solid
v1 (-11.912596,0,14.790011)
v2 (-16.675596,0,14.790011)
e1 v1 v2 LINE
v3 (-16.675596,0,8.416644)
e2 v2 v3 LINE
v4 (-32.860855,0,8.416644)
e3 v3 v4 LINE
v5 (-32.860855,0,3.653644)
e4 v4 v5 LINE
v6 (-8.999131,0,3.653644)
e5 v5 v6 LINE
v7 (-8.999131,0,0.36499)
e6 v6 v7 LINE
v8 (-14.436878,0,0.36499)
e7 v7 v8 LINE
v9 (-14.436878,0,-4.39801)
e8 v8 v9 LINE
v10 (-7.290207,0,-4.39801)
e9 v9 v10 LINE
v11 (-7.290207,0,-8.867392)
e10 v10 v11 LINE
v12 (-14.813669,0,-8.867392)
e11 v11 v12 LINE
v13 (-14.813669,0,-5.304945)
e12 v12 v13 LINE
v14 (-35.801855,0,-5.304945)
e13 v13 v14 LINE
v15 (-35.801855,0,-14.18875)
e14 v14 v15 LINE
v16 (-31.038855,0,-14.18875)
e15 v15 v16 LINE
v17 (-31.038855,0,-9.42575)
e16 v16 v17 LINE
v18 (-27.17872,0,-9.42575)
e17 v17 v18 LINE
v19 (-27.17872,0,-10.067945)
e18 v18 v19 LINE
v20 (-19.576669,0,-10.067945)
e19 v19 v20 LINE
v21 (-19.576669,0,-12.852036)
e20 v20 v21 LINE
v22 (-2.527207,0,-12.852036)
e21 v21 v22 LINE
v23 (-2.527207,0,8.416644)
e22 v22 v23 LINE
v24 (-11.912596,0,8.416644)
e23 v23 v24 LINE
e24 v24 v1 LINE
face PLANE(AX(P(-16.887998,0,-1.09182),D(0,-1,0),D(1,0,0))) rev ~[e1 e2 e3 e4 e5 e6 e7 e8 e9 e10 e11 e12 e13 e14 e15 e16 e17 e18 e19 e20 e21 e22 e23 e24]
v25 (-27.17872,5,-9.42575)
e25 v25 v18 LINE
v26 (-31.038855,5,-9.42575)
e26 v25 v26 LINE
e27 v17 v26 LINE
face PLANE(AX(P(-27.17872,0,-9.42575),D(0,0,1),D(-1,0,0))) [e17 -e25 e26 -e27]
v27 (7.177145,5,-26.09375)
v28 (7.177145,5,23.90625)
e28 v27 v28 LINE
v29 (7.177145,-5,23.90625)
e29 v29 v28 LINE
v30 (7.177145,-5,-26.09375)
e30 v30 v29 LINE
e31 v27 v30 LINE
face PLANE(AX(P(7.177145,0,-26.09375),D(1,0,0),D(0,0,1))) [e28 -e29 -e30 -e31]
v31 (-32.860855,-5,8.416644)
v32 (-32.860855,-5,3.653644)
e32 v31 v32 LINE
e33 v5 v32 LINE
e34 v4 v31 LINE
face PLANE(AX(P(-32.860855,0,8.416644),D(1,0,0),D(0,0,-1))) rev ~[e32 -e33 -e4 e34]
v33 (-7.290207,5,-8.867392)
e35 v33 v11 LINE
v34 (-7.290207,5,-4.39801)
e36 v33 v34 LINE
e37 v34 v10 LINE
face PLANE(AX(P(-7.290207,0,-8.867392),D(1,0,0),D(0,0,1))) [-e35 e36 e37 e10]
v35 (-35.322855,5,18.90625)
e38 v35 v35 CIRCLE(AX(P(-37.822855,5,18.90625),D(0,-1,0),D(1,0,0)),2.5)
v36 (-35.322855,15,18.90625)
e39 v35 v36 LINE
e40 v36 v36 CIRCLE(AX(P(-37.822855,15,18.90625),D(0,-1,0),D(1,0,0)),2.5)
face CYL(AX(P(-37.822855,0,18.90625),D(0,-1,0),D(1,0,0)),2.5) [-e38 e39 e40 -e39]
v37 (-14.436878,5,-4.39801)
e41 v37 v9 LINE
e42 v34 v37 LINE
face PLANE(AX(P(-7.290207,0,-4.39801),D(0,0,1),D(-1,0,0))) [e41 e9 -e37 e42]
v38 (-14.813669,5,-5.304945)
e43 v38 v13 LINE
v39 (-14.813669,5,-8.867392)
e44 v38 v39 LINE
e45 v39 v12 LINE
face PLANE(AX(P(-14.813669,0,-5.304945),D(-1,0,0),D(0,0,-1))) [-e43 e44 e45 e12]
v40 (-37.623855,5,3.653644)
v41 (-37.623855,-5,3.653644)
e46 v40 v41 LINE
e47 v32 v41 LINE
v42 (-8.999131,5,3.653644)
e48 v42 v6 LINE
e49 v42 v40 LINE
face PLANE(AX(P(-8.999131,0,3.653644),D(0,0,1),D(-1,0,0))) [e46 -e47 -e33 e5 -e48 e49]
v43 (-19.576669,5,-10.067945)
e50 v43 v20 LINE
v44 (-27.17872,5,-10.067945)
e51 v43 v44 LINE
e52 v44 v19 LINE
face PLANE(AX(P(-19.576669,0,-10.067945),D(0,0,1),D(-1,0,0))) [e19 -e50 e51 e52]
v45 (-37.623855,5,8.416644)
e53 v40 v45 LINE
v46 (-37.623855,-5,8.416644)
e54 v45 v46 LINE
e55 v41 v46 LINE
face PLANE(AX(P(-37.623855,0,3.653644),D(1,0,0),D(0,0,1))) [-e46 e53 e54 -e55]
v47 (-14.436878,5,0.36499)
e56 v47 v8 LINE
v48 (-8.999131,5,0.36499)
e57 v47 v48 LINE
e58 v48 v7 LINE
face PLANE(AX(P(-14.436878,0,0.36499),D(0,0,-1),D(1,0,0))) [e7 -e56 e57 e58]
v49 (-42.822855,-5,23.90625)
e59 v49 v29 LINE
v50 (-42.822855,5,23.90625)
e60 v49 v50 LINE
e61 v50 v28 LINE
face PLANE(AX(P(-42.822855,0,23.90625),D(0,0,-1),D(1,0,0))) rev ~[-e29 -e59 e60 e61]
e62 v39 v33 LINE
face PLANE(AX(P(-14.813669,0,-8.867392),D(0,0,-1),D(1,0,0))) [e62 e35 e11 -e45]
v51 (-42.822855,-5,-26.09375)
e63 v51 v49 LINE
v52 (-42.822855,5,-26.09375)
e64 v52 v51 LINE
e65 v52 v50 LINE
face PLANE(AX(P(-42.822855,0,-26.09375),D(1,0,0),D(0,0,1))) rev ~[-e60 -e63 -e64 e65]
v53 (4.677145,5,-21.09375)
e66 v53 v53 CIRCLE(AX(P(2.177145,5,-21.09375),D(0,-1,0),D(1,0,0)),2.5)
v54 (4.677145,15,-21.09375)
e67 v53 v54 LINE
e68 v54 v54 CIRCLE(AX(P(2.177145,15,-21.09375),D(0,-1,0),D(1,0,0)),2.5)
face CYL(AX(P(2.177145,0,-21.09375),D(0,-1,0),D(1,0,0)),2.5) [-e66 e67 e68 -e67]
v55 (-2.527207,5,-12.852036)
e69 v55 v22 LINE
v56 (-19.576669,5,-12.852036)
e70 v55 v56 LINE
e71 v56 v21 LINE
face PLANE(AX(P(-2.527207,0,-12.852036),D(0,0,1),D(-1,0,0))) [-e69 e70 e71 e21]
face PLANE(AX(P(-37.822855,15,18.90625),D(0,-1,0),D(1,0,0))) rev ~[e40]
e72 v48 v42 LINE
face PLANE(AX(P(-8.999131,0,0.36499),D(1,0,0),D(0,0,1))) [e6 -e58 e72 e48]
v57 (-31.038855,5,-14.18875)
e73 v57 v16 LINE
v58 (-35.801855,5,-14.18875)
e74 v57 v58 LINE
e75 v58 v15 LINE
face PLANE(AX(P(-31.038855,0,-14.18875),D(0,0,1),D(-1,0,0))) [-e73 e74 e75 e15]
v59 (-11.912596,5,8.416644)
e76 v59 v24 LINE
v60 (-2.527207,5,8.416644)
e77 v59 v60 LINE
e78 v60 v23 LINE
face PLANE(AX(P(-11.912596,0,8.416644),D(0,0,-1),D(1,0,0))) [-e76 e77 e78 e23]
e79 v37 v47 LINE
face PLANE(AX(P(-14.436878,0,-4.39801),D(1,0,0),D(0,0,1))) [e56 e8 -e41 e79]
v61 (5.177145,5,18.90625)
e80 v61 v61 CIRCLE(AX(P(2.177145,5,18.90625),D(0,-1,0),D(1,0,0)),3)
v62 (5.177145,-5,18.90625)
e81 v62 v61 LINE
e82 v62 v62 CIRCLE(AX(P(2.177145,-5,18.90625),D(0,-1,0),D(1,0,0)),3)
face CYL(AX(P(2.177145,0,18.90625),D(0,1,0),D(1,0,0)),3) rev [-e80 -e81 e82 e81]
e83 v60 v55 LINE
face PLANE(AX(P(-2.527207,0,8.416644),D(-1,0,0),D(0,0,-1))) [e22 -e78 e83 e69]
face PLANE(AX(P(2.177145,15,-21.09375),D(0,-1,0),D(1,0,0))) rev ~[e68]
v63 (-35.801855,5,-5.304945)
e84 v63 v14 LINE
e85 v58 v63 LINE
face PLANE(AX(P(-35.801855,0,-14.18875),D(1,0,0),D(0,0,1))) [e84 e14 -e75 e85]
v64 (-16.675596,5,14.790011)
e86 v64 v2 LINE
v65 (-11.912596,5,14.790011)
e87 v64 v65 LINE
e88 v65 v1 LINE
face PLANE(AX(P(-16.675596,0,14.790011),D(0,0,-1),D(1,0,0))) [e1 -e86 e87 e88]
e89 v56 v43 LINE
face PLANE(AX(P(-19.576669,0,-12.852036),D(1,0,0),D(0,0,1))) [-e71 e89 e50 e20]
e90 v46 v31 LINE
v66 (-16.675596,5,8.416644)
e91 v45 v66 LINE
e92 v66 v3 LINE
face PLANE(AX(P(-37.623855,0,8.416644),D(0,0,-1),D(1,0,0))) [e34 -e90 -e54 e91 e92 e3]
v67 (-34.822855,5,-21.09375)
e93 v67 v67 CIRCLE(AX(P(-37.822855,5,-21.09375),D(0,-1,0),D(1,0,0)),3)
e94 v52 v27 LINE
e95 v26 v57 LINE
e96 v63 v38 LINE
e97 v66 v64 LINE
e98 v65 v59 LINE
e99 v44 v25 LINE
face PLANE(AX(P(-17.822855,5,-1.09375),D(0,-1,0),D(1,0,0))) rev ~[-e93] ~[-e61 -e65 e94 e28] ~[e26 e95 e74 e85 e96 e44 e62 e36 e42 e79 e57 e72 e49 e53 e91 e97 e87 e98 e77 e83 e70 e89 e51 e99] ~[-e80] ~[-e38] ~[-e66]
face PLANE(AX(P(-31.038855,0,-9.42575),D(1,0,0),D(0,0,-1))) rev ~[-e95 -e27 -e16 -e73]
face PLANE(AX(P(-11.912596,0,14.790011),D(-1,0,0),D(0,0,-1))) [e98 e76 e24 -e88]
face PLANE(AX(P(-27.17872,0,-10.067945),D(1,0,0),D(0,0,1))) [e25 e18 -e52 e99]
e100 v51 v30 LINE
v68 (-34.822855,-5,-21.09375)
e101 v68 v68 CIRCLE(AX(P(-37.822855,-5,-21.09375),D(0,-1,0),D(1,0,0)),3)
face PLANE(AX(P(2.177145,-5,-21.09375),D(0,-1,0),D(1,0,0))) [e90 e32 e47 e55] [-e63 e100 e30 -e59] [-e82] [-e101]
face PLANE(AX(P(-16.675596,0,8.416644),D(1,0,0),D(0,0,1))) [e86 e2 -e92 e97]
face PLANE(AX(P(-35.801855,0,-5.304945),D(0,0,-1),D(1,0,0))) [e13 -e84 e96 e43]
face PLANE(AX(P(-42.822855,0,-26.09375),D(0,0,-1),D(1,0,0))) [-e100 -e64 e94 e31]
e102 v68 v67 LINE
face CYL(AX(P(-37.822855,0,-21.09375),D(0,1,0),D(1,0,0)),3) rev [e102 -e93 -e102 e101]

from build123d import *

# Parameters (mm, degrees)
F0_W          = 50
F0_H          = 50
F0_R          = 3
F0_R_2        = 2.5
F1_DEPTH      = 5
F0_W_2        = 4.763
F0_H_2        = 4.763
F2_DEPTH      = 5
F3_DEPTH      = 15
F3_DEPTH_BACK = 5


with BuildPart() as f1:
    # F0 (on Front) → F1 (new body, symmetric)
    with BuildSketch(Plane.XZ):
        with Locations((-17.8228546229, -1.0937498882)):
            Rectangle(F0_W, F0_H)
        with Locations((-37.8228546229, -21.0937498882)):
            Circle(F0_R, mode=Mode.SUBTRACT)
        with Locations((2.1771453771, -21.0937498882)):
            Circle(F0_R_2, mode=Mode.SUBTRACT)
        Polygon((-37.6238546229, 8.4166441185), (-32.8608546229, 8.4166441185), (-16.6755962394, 8.4166441185), (-16.6755962394, 14.7900106385), (-11.9125962394, 14.7900106385), (-11.9125962394, 8.4166441185), (-2.5272074943, 8.4166441185), (-2.5272074943, -12.8520363942), (-13.7815852112, -12.8520363942), (-19.5766687393, -12.8520363942), (-19.5766687393, -10.0679453462), (-27.1787202845, -10.0679453462), (-27.1787202845, -9.4257498882), (-31.0388546229, -9.4257498882), (-31.0388546229, -14.1887498882), (-35.8018546229, -14.1887498882), (-35.8018546229, -9.4257498882), (-35.8018546229, -5.3049453462), (-27.1787202845, -5.3049453462), (-14.8136687393, -5.3049453462), (-14.8136687393, -8.8673923165), (-7.2902074943, -8.8673923165), (-7.2902074943, -4.3980097398), (-14.436878264, -4.3980097398), (-14.436878264, 0.3649902602), (-8.9991306886, 0.3649902602), (-8.9991306886, 3.6536441185), (-16.6755962394, 3.6536441185), (-32.8608546229, 3.6536441185), (-37.6238546229, 3.6536441185), align=None, mode=Mode.SUBTRACT)
        with Locations((-37.8228546229, 18.9062501118)):
            Circle(F0_R_2, mode=Mode.SUBTRACT)
        with Locations((2.1771453771, 18.9062501118)):
            Circle(F0_R, mode=Mode.SUBTRACT)
    extrude(amount=F1_DEPTH, both=True)

    # F0 (on Front) → F2 (join)
    with BuildSketch(Plane.XZ):
        Polygon((-16.6755962394, 8.4166441185), (-32.8608546229, 8.4166441185), (-32.8608546229, 3.6536441185), (-16.6755962394, 3.6536441185), (-8.9991306886, 3.6536441185), (-8.9991306886, 0.3649902602), (-14.436878264, 0.3649902602), (-14.436878264, -4.3980097398), (-7.2902074943, -4.3980097398), (-7.2902074943, -8.8673923165), (-14.8136687393, -8.8673923165), (-14.8136687393, -5.3049453462), (-27.1787202845, -5.3049453462), (-35.8018546229, -5.3049453462), (-35.8018546229, -9.4257498882), (-31.0388546229, -9.4257498882), (-27.1787202845, -9.4257498882), (-27.1787202845, -10.0679453462), (-19.5766687393, -10.0679453462), (-19.5766687393, -12.8520363942), (-13.7815852112, -12.8520363942), (-2.5272074943, -12.8520363942), (-2.5272074943, 8.4166441185), (-11.9125962394, 8.4166441185), (-11.9125962394, 14.7900106385), (-16.6755962394, 14.7900106385), align=None)
        with Locations((-33.4203546229, -11.8072498882)):
            Rectangle(F0_W_2, F0_H_2)
    extrude(amount=F2_DEPTH)

    # F0 (on Front) → F3 (join, two sides)
    with BuildSketch(Plane.XZ) as f3_sk:
        with Locations((2.1771453771, -21.0937498882)):
            Circle(F0_R_2)
        with Locations((-37.8228546229, 18.9062501118)):
            Circle(F0_R_2)
    extrude(amount=-F3_DEPTH)
    extrude(f3_sk.sketch, amount=F3_DEPTH_BACK)


solid = f1.part
